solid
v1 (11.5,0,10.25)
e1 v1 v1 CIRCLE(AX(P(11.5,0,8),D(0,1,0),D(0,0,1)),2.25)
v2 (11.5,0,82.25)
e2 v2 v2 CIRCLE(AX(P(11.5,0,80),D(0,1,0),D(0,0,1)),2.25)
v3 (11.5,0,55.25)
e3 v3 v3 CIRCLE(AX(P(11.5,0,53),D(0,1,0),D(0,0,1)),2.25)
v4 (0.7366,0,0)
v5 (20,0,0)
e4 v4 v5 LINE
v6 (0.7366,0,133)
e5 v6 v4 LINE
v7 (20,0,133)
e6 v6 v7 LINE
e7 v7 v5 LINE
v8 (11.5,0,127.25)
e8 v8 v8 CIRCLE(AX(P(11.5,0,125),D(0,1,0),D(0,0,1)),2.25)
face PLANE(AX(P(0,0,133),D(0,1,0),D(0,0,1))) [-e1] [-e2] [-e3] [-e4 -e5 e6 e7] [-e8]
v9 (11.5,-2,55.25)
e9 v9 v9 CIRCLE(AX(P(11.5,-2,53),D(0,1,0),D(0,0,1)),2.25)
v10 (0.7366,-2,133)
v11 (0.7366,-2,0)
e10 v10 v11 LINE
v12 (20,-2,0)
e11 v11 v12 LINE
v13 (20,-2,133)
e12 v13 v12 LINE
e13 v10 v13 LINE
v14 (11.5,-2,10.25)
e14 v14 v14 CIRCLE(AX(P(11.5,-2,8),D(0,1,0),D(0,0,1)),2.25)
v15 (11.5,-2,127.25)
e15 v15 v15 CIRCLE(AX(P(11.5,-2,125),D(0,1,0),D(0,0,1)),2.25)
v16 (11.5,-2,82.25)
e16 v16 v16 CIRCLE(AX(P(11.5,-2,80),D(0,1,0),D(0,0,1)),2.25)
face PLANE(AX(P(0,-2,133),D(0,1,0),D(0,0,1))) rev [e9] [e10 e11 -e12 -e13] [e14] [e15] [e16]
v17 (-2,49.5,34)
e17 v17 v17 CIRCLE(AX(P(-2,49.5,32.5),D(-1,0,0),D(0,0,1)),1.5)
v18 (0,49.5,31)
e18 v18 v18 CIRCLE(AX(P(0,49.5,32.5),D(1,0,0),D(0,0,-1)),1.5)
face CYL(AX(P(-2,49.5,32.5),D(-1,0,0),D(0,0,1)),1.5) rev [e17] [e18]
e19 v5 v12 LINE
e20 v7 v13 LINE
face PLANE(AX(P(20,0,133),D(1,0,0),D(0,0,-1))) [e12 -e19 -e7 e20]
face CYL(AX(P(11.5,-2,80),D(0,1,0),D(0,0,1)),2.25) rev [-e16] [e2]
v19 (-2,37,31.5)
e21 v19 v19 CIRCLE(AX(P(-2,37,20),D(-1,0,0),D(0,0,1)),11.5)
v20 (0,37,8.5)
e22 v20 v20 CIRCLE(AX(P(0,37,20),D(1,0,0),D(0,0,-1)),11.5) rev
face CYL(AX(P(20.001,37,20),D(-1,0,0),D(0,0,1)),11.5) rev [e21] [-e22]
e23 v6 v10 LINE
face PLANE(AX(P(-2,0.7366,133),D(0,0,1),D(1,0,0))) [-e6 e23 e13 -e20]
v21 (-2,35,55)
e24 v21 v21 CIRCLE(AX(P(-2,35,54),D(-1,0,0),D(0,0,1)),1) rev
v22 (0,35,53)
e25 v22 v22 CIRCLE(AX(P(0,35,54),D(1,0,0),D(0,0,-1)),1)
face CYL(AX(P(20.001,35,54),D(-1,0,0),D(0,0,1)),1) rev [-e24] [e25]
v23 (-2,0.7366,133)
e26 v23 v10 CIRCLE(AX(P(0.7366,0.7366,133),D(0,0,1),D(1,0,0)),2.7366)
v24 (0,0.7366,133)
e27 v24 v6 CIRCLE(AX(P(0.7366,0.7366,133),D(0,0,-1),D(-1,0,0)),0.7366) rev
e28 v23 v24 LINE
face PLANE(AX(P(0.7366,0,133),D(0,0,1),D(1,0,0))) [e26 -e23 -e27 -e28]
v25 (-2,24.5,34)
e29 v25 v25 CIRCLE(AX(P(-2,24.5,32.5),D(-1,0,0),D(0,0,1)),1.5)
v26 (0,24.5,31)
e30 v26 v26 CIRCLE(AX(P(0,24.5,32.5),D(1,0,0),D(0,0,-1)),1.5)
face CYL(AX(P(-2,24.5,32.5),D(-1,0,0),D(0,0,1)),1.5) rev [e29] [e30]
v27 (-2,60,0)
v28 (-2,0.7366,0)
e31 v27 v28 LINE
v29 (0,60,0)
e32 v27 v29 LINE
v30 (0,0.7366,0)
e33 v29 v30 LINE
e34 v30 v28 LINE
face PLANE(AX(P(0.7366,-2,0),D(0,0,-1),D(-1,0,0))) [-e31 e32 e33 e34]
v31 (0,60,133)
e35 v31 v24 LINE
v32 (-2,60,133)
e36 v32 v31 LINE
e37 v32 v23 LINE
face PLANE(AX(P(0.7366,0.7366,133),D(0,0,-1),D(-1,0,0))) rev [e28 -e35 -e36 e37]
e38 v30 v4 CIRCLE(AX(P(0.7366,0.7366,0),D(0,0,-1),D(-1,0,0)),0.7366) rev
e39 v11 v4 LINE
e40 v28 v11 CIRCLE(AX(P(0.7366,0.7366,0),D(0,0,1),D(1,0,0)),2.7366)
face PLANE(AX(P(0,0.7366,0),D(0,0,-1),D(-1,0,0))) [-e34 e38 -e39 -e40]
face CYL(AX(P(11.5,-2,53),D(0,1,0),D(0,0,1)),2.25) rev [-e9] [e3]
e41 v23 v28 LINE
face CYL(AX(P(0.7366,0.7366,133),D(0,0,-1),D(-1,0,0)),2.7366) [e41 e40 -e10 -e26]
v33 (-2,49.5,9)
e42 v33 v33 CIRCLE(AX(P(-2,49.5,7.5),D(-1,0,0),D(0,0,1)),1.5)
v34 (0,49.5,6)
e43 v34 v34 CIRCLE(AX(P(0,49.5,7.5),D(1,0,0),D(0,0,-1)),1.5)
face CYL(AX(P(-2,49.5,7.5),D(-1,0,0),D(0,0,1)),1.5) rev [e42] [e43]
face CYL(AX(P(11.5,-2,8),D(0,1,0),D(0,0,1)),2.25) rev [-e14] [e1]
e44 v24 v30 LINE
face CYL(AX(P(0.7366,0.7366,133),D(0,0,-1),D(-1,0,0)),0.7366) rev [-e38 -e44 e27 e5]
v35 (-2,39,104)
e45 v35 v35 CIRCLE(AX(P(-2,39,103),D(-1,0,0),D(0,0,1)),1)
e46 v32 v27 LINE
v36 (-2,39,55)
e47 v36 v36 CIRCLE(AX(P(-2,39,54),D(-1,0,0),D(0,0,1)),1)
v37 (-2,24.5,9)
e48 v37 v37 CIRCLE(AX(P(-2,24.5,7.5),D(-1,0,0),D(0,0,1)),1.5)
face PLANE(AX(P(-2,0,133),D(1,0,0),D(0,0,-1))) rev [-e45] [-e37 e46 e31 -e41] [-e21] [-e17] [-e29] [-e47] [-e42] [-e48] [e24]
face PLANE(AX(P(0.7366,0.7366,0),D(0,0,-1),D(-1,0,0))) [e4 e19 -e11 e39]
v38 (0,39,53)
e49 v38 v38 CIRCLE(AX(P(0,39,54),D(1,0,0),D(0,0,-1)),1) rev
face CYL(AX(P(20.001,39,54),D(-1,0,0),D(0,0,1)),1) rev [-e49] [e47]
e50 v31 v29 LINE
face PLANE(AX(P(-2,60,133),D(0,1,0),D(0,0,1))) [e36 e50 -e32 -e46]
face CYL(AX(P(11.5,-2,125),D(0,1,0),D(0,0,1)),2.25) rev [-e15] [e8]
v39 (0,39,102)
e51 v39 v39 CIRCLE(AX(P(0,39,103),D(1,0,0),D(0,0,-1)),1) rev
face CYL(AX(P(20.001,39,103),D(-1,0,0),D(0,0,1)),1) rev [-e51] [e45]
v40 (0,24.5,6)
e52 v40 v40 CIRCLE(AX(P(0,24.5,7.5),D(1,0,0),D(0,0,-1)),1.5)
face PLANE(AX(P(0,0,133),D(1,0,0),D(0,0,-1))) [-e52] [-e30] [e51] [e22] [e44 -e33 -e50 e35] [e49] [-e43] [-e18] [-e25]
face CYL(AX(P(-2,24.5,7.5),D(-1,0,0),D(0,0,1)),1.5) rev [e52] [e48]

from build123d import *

# Parameters (mm, degrees)
SM_BASE_FLANGE_1_DEPTH = 133
CUT_EXTRUDE_1_REACH    = 149.557
SKETCH_2_R             = 1
SKETCH_2_R_2           = 11.5
M3X0_5_1_D             = 2.5
M3X0_5_1_DEPTH         = 7.5
M3X0_5_1_CBORE_D       = 3
M3X0_5_1_CBORE_DEPTH   = 6
M3X0_5_1_TIP           = 0.751075774
SKETCH_5_R             = 2.25
CUT_EXTRUDE_2_DEPTH    = 148.271857461


# Sheet-metal steps are written as plain solids
with BuildPart() as part:
    # Sketch 1 → 基材-凸緣1 (new body)
    with BuildSketch(Plane.XY):
        with BuildLine():
            Line((0, 60), (0, 0.7366))
            ThreePointArc((0, 0.7366), (0.215745145, 0.215745145), (0.7366, 0))
            Line((0.7366, 0), (20, 0))
            Line((20, 0), (20, -2))
            Line((20, -2), (0.7366, -2))
            ThreePointArc((0.7366, -2), (-1.198468417, -1.198468417), (-2, 0.7366))
            Line((-2, 0.7366), (-2, 60))
            Line((-2, 60), (0, 60))
        make_face()
    extrude(amount=SM_BASE_FLANGE_1_DEPTH)

    # Sketch 2 → 除料-伸長1 (cut, up to next)
    with BuildSketch(Plane.ZY.offset(2), mode=Mode.PRIVATE) as cut_extrude_1_sk1:
        with Locations((103, 39)):
            Circle(SKETCH_2_R)
    cut_extrude_1_tool1 = extrude(cut_extrude_1_sk1.sketch, amount=-CUT_EXTRUDE_1_REACH, mode=Mode.PRIVATE) & part.part
    # Sketch 2 → 除料-伸長1 (cut, up to next)
    with BuildSketch(Plane.ZY.offset(2), mode=Mode.PRIVATE) as cut_extrude_1_sk2:
        with Locations((54, 39)):
            Circle(SKETCH_2_R)
    cut_extrude_1_tool2 = extrude(cut_extrude_1_sk2.sketch, amount=-CUT_EXTRUDE_1_REACH, mode=Mode.PRIVATE) & part.part
    # Sketch 2 → 除料-伸長1 (cut, up to next)
    with BuildSketch(Plane.ZY.offset(2), mode=Mode.PRIVATE) as cut_extrude_1_sk3:
        with Locations((54, 35)):
            Circle(SKETCH_2_R)
    cut_extrude_1_tool3 = extrude(cut_extrude_1_sk3.sketch, amount=-CUT_EXTRUDE_1_REACH, mode=Mode.PRIVATE) & part.part
    # Sketch 2 → 除料-伸長1 (cut, up to next)
    with BuildSketch(Plane.ZY.offset(2), mode=Mode.PRIVATE) as cut_extrude_1_sk4:
        with Locations((20, 37)):
            Circle(SKETCH_2_R_2)
    cut_extrude_1_tool4 = extrude(cut_extrude_1_sk4.sketch, amount=-CUT_EXTRUDE_1_REACH, mode=Mode.PRIVATE) & part.part
    add(cut_extrude_1_tool1.solids().sort_by_distance((-2, 39, 103))[0], mode=Mode.SUBTRACT)
    add(cut_extrude_1_tool2.solids().sort_by_distance((-2, 39, 54))[0], mode=Mode.SUBTRACT)
    add(cut_extrude_1_tool3.solids().sort_by_distance((-2, 35, 54))[0], mode=Mode.SUBTRACT)
    add(cut_extrude_1_tool4.solids().sort_by_distance((-2, 37, 20))[0], mode=Mode.SUBTRACT)

    # M3x0.5 螺紋孔1
    with Locations(Plane.ZY.offset(2)):
        with Locations((32.5, 49.5), (32.5, 24.5), (7.5, 49.5), (7.5, 24.5)):
            CounterBoreHole(M3X0_5_1_D / 2, M3X0_5_1_CBORE_D / 2, M3X0_5_1_CBORE_DEPTH, depth=M3X0_5_1_DEPTH)
            with Locations((0, 0, -(M3X0_5_1_DEPTH + M3X0_5_1_TIP / 2))):  # 118° drill point
                Cone(0, M3X0_5_1_D / 2, M3X0_5_1_TIP, mode=Mode.SUBTRACT)

    # 草圖5 → 除料-伸長2 (cut, through all)
    with BuildSketch(Plane(origin=(0, 0, 0), x_dir=(1, 0, 0), z_dir=(0, 1, 0))):
        with Locations(Location((11.5, -125, 0), (0, 0, 270))):
            Circle(SKETCH_5_R)
        with Locations(Location((11.5, -80, 0), (0, 0, 270))):
            Circle(SKETCH_5_R)
        with Locations(Location((11.5, -53, 0), (0, 0, 270))):
            Circle(SKETCH_5_R)
        with Locations(Location((11.5, -8, 0), (0, 0, 270))):
            Circle(SKETCH_5_R)
    extrude(amount=-CUT_EXTRUDE_2_DEPTH, mode=Mode.SUBTRACT)


solid = part.part
